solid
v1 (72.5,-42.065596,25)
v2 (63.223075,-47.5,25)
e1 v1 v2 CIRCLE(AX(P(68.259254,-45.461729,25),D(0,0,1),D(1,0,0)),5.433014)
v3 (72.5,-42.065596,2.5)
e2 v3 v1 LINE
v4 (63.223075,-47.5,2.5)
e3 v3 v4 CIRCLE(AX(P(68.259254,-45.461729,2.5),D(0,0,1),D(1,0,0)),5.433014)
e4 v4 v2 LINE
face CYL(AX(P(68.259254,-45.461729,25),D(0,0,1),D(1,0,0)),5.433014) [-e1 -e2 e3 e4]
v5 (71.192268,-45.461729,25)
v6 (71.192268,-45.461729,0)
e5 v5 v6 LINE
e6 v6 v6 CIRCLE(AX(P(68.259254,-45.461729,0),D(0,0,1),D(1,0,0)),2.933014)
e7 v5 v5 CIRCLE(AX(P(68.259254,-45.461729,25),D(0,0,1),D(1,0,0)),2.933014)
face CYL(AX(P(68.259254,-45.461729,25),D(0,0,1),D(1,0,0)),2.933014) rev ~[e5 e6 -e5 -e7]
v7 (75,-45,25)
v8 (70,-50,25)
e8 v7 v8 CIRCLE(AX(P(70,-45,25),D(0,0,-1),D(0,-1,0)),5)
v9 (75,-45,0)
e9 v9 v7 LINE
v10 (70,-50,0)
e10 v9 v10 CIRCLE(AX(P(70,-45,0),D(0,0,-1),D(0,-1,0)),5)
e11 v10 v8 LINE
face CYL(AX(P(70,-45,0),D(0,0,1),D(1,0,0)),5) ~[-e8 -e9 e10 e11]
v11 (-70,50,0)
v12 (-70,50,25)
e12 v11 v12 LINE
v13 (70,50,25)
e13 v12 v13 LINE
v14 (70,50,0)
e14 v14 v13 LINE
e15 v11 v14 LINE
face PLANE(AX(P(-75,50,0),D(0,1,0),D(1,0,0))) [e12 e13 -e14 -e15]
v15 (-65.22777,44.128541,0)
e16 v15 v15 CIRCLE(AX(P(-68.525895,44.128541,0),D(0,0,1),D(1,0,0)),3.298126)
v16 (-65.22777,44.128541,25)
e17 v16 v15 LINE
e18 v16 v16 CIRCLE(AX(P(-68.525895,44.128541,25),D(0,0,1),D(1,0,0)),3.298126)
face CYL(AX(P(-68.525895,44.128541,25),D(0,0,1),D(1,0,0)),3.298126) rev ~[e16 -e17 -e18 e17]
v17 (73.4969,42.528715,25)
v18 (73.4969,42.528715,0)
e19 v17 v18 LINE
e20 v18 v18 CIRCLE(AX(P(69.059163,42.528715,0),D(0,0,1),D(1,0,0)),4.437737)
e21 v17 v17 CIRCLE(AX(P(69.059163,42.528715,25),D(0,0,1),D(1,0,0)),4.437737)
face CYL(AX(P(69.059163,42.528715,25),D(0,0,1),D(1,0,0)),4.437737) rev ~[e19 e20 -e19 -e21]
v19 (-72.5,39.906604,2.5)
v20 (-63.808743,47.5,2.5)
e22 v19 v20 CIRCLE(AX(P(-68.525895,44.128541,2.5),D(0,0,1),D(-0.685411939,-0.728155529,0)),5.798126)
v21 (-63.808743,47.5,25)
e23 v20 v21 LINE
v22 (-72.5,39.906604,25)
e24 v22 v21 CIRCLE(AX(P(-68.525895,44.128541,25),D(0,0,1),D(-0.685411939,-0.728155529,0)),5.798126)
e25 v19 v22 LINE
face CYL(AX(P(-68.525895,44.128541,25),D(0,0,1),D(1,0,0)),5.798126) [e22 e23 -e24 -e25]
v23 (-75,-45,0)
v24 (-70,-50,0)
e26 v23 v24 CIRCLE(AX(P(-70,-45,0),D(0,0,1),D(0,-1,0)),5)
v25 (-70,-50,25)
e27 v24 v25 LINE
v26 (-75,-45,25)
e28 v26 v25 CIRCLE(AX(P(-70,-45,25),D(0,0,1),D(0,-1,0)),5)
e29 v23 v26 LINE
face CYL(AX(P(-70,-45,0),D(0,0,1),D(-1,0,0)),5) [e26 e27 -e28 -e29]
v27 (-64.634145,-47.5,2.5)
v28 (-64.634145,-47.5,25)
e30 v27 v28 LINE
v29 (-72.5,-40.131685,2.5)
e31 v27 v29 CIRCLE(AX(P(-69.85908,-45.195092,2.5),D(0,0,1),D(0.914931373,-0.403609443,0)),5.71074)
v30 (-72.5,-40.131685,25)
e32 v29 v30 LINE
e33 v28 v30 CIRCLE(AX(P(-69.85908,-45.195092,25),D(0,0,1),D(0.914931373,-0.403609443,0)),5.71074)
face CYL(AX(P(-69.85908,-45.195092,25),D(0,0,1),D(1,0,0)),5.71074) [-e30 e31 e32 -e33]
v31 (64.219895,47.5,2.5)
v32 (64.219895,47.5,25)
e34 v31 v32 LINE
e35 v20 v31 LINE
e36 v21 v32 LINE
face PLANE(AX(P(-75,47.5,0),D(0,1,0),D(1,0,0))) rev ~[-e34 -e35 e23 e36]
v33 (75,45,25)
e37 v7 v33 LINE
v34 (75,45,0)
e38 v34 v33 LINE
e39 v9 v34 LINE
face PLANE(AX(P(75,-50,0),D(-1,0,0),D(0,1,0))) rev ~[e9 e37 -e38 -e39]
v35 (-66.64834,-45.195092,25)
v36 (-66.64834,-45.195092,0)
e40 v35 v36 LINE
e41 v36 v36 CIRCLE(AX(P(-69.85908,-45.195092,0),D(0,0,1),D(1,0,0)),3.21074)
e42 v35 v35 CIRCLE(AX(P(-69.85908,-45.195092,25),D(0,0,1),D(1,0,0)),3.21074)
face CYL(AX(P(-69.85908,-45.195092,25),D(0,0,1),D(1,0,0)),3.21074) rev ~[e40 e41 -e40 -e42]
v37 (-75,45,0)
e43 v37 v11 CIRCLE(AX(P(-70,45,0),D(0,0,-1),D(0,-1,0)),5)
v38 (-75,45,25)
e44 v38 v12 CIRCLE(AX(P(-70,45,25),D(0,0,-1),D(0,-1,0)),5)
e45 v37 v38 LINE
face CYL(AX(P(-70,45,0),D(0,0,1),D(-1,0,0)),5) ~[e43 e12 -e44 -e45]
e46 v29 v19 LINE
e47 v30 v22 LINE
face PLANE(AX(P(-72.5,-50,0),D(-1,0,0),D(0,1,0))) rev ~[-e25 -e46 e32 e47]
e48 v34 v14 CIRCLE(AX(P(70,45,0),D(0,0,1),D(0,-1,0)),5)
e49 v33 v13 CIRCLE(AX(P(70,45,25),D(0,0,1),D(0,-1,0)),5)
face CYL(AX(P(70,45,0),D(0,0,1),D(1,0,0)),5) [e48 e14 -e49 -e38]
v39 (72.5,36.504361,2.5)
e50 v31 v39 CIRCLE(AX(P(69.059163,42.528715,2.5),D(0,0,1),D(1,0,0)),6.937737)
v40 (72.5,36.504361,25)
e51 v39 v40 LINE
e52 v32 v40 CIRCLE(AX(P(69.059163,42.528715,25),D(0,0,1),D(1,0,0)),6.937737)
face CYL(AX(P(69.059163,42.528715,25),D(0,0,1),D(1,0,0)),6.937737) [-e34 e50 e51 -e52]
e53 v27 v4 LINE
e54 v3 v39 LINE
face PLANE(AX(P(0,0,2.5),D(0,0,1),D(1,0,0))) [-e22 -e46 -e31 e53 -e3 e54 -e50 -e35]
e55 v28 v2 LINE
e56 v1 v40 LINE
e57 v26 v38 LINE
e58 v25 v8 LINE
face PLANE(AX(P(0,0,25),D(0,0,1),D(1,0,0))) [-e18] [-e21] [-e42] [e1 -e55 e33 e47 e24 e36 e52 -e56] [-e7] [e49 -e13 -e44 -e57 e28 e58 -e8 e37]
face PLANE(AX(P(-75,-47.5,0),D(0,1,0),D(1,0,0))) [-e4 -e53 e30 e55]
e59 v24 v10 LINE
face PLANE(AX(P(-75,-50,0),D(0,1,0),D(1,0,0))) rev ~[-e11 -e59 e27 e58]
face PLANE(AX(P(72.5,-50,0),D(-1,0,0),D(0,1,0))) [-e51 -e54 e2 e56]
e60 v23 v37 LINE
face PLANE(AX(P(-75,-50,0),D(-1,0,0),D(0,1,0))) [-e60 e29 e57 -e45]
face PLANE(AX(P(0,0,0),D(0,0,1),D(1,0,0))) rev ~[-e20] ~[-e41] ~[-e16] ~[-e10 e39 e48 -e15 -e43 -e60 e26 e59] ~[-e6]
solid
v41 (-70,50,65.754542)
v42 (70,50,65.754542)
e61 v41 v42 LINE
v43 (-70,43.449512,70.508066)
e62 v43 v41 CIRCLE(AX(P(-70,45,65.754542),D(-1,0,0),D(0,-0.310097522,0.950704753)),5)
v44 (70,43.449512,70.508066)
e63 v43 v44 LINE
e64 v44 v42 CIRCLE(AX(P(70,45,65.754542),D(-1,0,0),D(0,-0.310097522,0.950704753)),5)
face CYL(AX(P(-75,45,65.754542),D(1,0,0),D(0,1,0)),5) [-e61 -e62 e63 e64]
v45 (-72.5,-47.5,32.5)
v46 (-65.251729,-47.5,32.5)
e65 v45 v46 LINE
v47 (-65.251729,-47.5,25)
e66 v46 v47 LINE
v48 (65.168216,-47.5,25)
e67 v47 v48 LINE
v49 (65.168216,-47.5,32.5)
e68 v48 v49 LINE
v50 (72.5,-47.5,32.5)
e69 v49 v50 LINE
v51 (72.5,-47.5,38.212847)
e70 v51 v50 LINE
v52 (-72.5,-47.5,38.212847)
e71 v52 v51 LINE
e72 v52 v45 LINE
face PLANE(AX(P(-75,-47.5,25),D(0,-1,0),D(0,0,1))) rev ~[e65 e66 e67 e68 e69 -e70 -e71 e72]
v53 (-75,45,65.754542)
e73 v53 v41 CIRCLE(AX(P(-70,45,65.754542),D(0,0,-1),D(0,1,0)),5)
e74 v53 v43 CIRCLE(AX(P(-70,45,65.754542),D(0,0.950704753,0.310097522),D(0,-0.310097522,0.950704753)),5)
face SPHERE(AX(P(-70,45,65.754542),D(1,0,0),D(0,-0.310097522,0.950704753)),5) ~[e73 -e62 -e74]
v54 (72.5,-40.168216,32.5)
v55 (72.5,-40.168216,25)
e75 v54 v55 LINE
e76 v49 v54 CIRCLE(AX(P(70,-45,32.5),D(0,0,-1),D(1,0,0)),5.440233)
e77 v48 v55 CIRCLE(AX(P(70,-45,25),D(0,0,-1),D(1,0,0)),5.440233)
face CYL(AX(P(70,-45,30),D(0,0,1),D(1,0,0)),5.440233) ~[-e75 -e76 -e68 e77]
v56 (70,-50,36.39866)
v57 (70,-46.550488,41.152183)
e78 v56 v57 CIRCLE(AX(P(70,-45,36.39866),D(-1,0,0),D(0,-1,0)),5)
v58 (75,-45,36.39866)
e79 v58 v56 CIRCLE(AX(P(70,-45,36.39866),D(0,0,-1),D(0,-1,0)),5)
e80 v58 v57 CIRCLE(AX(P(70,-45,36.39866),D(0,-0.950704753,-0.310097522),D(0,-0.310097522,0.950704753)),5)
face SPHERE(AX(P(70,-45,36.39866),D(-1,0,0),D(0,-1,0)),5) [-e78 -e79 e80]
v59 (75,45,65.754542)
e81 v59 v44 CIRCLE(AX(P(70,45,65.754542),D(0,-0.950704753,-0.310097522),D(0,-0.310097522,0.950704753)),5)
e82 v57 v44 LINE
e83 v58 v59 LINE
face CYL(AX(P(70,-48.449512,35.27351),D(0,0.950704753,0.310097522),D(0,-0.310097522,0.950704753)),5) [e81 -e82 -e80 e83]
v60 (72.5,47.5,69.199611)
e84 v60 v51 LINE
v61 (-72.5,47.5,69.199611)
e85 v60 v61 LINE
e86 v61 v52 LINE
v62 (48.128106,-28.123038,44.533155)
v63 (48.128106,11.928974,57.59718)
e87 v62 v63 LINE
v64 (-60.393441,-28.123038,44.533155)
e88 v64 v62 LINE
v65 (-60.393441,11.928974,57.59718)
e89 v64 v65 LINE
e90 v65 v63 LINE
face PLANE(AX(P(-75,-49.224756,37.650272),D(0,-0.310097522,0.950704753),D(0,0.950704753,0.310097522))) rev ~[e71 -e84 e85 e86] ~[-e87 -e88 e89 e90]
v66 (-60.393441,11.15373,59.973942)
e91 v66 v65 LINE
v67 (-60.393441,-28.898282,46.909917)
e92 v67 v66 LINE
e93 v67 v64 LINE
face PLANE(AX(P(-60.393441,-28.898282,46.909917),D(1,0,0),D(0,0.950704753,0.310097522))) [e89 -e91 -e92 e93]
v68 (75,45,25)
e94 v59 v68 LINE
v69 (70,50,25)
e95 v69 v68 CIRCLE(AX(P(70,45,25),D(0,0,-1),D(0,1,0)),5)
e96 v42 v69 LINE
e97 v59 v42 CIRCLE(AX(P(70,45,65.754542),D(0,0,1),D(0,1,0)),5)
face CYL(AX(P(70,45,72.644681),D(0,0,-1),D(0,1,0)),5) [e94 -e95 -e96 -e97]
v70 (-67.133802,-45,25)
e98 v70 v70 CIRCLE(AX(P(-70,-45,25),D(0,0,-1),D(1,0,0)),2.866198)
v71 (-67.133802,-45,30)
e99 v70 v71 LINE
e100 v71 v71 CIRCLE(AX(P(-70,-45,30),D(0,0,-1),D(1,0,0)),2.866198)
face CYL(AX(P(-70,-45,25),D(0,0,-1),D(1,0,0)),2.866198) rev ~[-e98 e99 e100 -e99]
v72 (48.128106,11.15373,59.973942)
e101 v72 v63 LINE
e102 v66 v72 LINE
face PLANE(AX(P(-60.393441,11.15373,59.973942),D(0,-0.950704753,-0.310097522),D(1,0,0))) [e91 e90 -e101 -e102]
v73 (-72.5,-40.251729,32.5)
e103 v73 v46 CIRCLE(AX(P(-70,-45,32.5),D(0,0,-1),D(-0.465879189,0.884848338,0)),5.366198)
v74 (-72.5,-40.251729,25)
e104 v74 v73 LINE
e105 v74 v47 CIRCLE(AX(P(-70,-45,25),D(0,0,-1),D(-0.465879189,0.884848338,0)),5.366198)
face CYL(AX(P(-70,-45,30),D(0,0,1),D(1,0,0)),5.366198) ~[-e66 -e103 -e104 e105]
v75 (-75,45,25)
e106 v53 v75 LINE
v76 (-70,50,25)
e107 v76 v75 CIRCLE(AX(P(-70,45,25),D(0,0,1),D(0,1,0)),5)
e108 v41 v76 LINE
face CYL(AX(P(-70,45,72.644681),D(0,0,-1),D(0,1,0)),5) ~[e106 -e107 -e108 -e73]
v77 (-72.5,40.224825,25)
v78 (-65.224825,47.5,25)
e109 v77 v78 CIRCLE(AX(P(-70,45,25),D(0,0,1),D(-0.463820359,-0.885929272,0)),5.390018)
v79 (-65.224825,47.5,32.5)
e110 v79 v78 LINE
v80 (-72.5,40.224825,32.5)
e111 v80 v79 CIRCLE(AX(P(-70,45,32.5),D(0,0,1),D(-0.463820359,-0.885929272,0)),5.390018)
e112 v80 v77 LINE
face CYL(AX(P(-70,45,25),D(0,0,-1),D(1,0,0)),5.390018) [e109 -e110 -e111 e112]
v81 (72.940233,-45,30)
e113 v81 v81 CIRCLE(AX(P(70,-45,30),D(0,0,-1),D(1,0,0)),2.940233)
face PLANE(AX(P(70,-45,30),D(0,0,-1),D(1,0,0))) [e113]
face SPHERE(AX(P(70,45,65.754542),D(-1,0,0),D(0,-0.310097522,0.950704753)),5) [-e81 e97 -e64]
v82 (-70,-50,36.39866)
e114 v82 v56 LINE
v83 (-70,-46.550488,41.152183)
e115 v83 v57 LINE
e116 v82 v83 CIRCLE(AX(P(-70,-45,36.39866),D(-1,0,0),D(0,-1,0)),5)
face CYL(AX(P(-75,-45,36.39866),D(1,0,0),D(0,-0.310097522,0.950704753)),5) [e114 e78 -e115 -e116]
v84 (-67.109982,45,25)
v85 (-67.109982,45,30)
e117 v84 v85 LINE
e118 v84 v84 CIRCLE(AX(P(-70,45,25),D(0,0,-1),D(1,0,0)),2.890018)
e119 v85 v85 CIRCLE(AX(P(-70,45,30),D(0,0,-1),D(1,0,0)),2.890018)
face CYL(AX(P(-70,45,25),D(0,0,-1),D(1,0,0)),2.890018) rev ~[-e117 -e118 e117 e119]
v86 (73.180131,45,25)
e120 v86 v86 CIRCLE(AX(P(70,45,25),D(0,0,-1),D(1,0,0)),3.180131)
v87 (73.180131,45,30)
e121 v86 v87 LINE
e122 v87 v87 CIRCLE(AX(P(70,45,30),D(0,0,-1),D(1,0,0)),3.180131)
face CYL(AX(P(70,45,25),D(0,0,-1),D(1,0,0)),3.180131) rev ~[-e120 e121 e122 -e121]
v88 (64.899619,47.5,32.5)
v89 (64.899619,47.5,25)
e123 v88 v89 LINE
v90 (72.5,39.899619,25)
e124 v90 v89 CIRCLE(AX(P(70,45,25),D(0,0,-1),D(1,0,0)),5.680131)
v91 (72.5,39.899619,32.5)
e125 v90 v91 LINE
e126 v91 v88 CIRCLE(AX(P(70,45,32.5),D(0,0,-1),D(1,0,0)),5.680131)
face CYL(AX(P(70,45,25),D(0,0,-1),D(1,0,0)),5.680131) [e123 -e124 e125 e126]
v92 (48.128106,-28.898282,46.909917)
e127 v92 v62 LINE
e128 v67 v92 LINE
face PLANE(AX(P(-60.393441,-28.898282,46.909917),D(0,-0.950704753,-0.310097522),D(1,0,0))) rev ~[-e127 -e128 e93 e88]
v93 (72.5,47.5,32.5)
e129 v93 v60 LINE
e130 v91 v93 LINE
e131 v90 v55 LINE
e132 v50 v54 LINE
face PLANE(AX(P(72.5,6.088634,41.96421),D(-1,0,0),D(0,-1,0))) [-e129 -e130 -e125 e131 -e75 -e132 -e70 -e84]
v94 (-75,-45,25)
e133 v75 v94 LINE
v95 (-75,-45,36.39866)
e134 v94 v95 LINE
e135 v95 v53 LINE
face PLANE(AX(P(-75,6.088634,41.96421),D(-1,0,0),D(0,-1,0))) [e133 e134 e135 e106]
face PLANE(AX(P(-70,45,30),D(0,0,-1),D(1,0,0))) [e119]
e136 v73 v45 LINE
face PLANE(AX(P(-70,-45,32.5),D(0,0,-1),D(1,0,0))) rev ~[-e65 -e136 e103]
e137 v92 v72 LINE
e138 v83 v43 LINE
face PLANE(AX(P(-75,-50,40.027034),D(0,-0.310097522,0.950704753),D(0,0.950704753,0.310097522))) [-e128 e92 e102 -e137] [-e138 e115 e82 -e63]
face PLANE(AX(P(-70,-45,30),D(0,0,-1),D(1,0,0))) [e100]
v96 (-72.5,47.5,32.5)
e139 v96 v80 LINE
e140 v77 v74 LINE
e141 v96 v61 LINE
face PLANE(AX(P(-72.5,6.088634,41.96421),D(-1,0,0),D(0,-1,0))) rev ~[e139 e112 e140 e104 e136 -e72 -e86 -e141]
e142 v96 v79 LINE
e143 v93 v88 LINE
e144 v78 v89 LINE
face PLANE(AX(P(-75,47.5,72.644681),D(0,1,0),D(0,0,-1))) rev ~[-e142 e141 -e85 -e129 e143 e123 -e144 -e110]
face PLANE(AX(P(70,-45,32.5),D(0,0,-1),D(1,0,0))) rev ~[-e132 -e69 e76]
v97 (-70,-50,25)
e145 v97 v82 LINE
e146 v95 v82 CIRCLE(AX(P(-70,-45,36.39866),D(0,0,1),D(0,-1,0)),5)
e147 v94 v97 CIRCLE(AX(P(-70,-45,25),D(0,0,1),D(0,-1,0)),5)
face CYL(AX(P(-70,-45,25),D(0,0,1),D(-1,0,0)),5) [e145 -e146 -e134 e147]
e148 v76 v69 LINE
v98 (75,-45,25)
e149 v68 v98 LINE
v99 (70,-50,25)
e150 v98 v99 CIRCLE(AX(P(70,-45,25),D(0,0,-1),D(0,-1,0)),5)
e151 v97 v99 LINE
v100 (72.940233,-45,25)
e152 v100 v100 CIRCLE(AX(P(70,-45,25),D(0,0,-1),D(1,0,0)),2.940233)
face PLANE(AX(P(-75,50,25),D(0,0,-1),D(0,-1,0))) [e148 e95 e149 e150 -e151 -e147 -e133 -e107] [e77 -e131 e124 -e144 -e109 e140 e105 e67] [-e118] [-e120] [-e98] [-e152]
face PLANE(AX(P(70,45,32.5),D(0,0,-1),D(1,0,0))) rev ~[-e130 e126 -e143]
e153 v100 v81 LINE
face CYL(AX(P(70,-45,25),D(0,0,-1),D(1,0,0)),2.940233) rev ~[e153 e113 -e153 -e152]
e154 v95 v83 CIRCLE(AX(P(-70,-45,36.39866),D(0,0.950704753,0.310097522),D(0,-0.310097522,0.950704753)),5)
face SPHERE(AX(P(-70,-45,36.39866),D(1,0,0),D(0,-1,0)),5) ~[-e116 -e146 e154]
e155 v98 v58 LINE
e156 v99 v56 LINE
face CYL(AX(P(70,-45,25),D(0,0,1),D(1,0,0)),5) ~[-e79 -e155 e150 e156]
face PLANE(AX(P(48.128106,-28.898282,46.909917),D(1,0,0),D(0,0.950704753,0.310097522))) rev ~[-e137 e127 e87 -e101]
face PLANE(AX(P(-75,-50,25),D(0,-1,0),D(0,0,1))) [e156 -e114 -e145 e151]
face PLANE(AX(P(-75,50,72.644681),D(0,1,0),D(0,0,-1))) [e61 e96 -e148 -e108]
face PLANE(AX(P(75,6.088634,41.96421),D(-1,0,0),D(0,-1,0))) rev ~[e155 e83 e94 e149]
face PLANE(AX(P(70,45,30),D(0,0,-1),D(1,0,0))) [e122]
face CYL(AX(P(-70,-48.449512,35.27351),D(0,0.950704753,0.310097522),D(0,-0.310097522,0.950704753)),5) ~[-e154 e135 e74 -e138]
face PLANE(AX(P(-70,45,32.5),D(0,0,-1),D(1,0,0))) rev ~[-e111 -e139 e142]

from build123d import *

# Parameters (mm, degrees)
F0_W      = 150
F0_H      = 100
F1_DEPTH  = 25
F2_R      = 3.2981256226
F2_R_2    = 3.2107397339
F2_R_3    = 2.9330141842
F2_R_4    = 4.4377369933
F3_DEPTH  = 25.001
F4_T      = -2.5
F6_DEPTH  = 150
F7_R      = 2.8661980647
F7_R_2    = 2.890017818
F7_R_3    = 3.1801309688
F7_R_4    = 2.9402334405
F8_DEPTH  = 5
F9_T      = 2.5
F10_W     = 108.5215471685
F10_H     = 42.1287603676
F11_DEPTH = 69.0646432345
F12_R     = 5
F13_R     = 5


# Not quite as in the source:
# - a shell that OpenCascade refuses in one call is made with other operations: the cavity is built on its own and cut out


with BuildPart() as f1:
    # F0 (on Top) → F1 (new body)
    with BuildSketch(Plane.XY):
        Rectangle(F0_W, F0_H)
    extrude(amount=F1_DEPTH)

    # F2 (on face) → F3 (cut, through all)
    with BuildSketch(Plane.XY.offset(25)):
        with Locations((-68.5258954763, 44.1285409033)):
            Circle(F2_R)
        with Locations((-69.8590800166, -45.1950915158)):
            Circle(F2_R_2)
        with Locations((68.2592540979, -45.4617291689)):
            Circle(F2_R_3)
        with Locations((69.059163332, 42.5287149847)):
            Circle(F2_R_4)
    extrude(amount=-F3_DEPTH, mode=Mode.SUBTRACT)

    # F4
    f4_openings = [f1.faces().sort_by_distance(p)[0] for p in [
        (-0.101934, -0.097469, 25),
    ]]
    offset(amount=F4_T, openings=f4_openings)

    # F13
    f13_edges = [f1.edges().sort_by_distance(p)[0] for p in [
        (-75, -50, 12.5),
        (75, -50, 12.5),
        (75, 50, 12.5),
        (-75, 50, 12.5),
    ]]
    fillet(f13_edges, radius=F13_R)


with BuildPart() as f6:
    # F5 (on face) → F6 (new body, through all)
    with BuildSketch(Plane(origin=(-75, 0, 0), x_dir=(0, -1, 0), z_dir=(-1, 0, 0))):
        Polygon((-50, 72.6446807384), (-50, 25), (50, 25), (50, 40.0270335376), align=None)
    extrude(amount=-F6_DEPTH)

    # F7 (on face) → F8 (cut)
    with BuildSketch(Plane(origin=(0, 0, 25), x_dir=(1, 0, 0), z_dir=(0, 0, -1))):
        with Locations((-70, 45)):
            Circle(F7_R)
        with Locations((-70, -45)):
            Circle(F7_R_2)
        with Locations((70, -45)):
            Circle(F7_R_3)
        with Locations((70, 45)):
            Circle(F7_R_4)
    extrude(amount=-F8_DEPTH, mode=Mode.SUBTRACT)

    # F9: shell of thickness 2.5, made by hand


with BuildPart() as f9_core1:
    # F9_t2: copy of F6
    add(f6.part)

    # the walls: a layer under each face that stays
    f9_faces = [f9_core1.faces().sort_by_distance(p)[0] for p in [
        (0, 0, 56.335857138),
        (0, -50, 32.5135167688),
        (0, 50, 48.8223403692),
        (-75, 0, 48.8223403692),
        (75, 0, 48.8223403692),
        (66.8198690312, 45, 27.5),
        (67.0597665595, -45, 27.5),
        (-72.890017818, 45, 27.5),
        (-72.8661980647, -45, 27.5),
        (70, 45, 30),
        (70, -45, 30),
        (-70, 45, 30),
        (-70, -45, 30),
    ]]
    thicken(f9_faces, amount=-F9_T, mode=Mode.SUBTRACT)

    # F9_s3 → F9_t4 (revolve, cut)
    with BuildSketch(Plane.XZ.offset(-45)):
        Polygon((73.1551309688, 29.975), (75.6801309688, 30), (75.6801309688, 32.5), (73.1801309688, 32.5), align=None)
    revolve(axis=Axis((70, 45, 30), (0, 0, -1)), mode=Mode.SUBTRACT)

    # F9_s5 → F9_t6 (revolve, cut)
    with BuildSketch(Plane.XZ.offset(45)):
        Polygon((72.9152334405, 29.975), (75.4402334405, 30), (75.4402334405, 32.5), (72.9402334405, 32.5), align=None)
    revolve(axis=Axis((70, -45, 30), (0, 0, -1)), mode=Mode.SUBTRACT)

    # F9_s7 → F9_t8 (revolve, cut)
    with BuildSketch(Plane.XZ.offset(-45)):
        Polygon((-67.134982182, 29.975), (-64.609982182, 30), (-64.609982182, 32.5), (-67.109982182, 32.5), align=None)
    revolve(axis=Axis((-70, 45, 30), (0, 0, -1)), mode=Mode.SUBTRACT)

    # F9_s9 → F9_t10 (revolve, cut)
    with BuildSketch(Plane.XZ.offset(45)):
        Polygon((-67.1588019353, 29.975), (-64.6338019353, 30), (-64.6338019353, 32.5), (-67.1338019353, 32.5), align=None)
    revolve(axis=Axis((-70, -45, 30), (0, 0, -1)), mode=Mode.SUBTRACT)


with BuildPart() as f6_1:
    add(f6.part)

    # what is left inside the walls is the cavity
    f9_cavity = [f9_core1.part.solids().sort_by_distance(p)[0] for p in [
        (24.166667, 0.007752, 53.682461),
    ]]
    add(f9_cavity, mode=Mode.SUBTRACT)

    # F10 (on face) → F11 (cut, through all)
    with BuildSketch(Plane(origin=(0, -16.6084409755, 50.9185744551), x_dir=(1, 0, 0), z_dir=(0, -0.3100975221, 0.9507047527))):
        with Locations((-6.1326678842, 8.1372950226)):
            Rectangle(F10_W, F10_H)
    extrude(amount=-F11_DEPTH, mode=Mode.SUBTRACT)

    # F12
    f12_edges = [f6_1.edges().sort_by_distance(p)[0] for p in [
        (0, 50, 72.644681),
        (-75, 0, 56.335857),
        (75, 0, 56.335857),
        (0, -50, 40.027034),
        (-75, -50, 32.513517),
        (75, -50, 32.513517),
        (75, 50, 48.82234),
        (-75, 50, 48.82234),
    ]]
    fillet(f12_edges, radius=F12_R)


solid = Compound([f1.part, f6_1.part])
